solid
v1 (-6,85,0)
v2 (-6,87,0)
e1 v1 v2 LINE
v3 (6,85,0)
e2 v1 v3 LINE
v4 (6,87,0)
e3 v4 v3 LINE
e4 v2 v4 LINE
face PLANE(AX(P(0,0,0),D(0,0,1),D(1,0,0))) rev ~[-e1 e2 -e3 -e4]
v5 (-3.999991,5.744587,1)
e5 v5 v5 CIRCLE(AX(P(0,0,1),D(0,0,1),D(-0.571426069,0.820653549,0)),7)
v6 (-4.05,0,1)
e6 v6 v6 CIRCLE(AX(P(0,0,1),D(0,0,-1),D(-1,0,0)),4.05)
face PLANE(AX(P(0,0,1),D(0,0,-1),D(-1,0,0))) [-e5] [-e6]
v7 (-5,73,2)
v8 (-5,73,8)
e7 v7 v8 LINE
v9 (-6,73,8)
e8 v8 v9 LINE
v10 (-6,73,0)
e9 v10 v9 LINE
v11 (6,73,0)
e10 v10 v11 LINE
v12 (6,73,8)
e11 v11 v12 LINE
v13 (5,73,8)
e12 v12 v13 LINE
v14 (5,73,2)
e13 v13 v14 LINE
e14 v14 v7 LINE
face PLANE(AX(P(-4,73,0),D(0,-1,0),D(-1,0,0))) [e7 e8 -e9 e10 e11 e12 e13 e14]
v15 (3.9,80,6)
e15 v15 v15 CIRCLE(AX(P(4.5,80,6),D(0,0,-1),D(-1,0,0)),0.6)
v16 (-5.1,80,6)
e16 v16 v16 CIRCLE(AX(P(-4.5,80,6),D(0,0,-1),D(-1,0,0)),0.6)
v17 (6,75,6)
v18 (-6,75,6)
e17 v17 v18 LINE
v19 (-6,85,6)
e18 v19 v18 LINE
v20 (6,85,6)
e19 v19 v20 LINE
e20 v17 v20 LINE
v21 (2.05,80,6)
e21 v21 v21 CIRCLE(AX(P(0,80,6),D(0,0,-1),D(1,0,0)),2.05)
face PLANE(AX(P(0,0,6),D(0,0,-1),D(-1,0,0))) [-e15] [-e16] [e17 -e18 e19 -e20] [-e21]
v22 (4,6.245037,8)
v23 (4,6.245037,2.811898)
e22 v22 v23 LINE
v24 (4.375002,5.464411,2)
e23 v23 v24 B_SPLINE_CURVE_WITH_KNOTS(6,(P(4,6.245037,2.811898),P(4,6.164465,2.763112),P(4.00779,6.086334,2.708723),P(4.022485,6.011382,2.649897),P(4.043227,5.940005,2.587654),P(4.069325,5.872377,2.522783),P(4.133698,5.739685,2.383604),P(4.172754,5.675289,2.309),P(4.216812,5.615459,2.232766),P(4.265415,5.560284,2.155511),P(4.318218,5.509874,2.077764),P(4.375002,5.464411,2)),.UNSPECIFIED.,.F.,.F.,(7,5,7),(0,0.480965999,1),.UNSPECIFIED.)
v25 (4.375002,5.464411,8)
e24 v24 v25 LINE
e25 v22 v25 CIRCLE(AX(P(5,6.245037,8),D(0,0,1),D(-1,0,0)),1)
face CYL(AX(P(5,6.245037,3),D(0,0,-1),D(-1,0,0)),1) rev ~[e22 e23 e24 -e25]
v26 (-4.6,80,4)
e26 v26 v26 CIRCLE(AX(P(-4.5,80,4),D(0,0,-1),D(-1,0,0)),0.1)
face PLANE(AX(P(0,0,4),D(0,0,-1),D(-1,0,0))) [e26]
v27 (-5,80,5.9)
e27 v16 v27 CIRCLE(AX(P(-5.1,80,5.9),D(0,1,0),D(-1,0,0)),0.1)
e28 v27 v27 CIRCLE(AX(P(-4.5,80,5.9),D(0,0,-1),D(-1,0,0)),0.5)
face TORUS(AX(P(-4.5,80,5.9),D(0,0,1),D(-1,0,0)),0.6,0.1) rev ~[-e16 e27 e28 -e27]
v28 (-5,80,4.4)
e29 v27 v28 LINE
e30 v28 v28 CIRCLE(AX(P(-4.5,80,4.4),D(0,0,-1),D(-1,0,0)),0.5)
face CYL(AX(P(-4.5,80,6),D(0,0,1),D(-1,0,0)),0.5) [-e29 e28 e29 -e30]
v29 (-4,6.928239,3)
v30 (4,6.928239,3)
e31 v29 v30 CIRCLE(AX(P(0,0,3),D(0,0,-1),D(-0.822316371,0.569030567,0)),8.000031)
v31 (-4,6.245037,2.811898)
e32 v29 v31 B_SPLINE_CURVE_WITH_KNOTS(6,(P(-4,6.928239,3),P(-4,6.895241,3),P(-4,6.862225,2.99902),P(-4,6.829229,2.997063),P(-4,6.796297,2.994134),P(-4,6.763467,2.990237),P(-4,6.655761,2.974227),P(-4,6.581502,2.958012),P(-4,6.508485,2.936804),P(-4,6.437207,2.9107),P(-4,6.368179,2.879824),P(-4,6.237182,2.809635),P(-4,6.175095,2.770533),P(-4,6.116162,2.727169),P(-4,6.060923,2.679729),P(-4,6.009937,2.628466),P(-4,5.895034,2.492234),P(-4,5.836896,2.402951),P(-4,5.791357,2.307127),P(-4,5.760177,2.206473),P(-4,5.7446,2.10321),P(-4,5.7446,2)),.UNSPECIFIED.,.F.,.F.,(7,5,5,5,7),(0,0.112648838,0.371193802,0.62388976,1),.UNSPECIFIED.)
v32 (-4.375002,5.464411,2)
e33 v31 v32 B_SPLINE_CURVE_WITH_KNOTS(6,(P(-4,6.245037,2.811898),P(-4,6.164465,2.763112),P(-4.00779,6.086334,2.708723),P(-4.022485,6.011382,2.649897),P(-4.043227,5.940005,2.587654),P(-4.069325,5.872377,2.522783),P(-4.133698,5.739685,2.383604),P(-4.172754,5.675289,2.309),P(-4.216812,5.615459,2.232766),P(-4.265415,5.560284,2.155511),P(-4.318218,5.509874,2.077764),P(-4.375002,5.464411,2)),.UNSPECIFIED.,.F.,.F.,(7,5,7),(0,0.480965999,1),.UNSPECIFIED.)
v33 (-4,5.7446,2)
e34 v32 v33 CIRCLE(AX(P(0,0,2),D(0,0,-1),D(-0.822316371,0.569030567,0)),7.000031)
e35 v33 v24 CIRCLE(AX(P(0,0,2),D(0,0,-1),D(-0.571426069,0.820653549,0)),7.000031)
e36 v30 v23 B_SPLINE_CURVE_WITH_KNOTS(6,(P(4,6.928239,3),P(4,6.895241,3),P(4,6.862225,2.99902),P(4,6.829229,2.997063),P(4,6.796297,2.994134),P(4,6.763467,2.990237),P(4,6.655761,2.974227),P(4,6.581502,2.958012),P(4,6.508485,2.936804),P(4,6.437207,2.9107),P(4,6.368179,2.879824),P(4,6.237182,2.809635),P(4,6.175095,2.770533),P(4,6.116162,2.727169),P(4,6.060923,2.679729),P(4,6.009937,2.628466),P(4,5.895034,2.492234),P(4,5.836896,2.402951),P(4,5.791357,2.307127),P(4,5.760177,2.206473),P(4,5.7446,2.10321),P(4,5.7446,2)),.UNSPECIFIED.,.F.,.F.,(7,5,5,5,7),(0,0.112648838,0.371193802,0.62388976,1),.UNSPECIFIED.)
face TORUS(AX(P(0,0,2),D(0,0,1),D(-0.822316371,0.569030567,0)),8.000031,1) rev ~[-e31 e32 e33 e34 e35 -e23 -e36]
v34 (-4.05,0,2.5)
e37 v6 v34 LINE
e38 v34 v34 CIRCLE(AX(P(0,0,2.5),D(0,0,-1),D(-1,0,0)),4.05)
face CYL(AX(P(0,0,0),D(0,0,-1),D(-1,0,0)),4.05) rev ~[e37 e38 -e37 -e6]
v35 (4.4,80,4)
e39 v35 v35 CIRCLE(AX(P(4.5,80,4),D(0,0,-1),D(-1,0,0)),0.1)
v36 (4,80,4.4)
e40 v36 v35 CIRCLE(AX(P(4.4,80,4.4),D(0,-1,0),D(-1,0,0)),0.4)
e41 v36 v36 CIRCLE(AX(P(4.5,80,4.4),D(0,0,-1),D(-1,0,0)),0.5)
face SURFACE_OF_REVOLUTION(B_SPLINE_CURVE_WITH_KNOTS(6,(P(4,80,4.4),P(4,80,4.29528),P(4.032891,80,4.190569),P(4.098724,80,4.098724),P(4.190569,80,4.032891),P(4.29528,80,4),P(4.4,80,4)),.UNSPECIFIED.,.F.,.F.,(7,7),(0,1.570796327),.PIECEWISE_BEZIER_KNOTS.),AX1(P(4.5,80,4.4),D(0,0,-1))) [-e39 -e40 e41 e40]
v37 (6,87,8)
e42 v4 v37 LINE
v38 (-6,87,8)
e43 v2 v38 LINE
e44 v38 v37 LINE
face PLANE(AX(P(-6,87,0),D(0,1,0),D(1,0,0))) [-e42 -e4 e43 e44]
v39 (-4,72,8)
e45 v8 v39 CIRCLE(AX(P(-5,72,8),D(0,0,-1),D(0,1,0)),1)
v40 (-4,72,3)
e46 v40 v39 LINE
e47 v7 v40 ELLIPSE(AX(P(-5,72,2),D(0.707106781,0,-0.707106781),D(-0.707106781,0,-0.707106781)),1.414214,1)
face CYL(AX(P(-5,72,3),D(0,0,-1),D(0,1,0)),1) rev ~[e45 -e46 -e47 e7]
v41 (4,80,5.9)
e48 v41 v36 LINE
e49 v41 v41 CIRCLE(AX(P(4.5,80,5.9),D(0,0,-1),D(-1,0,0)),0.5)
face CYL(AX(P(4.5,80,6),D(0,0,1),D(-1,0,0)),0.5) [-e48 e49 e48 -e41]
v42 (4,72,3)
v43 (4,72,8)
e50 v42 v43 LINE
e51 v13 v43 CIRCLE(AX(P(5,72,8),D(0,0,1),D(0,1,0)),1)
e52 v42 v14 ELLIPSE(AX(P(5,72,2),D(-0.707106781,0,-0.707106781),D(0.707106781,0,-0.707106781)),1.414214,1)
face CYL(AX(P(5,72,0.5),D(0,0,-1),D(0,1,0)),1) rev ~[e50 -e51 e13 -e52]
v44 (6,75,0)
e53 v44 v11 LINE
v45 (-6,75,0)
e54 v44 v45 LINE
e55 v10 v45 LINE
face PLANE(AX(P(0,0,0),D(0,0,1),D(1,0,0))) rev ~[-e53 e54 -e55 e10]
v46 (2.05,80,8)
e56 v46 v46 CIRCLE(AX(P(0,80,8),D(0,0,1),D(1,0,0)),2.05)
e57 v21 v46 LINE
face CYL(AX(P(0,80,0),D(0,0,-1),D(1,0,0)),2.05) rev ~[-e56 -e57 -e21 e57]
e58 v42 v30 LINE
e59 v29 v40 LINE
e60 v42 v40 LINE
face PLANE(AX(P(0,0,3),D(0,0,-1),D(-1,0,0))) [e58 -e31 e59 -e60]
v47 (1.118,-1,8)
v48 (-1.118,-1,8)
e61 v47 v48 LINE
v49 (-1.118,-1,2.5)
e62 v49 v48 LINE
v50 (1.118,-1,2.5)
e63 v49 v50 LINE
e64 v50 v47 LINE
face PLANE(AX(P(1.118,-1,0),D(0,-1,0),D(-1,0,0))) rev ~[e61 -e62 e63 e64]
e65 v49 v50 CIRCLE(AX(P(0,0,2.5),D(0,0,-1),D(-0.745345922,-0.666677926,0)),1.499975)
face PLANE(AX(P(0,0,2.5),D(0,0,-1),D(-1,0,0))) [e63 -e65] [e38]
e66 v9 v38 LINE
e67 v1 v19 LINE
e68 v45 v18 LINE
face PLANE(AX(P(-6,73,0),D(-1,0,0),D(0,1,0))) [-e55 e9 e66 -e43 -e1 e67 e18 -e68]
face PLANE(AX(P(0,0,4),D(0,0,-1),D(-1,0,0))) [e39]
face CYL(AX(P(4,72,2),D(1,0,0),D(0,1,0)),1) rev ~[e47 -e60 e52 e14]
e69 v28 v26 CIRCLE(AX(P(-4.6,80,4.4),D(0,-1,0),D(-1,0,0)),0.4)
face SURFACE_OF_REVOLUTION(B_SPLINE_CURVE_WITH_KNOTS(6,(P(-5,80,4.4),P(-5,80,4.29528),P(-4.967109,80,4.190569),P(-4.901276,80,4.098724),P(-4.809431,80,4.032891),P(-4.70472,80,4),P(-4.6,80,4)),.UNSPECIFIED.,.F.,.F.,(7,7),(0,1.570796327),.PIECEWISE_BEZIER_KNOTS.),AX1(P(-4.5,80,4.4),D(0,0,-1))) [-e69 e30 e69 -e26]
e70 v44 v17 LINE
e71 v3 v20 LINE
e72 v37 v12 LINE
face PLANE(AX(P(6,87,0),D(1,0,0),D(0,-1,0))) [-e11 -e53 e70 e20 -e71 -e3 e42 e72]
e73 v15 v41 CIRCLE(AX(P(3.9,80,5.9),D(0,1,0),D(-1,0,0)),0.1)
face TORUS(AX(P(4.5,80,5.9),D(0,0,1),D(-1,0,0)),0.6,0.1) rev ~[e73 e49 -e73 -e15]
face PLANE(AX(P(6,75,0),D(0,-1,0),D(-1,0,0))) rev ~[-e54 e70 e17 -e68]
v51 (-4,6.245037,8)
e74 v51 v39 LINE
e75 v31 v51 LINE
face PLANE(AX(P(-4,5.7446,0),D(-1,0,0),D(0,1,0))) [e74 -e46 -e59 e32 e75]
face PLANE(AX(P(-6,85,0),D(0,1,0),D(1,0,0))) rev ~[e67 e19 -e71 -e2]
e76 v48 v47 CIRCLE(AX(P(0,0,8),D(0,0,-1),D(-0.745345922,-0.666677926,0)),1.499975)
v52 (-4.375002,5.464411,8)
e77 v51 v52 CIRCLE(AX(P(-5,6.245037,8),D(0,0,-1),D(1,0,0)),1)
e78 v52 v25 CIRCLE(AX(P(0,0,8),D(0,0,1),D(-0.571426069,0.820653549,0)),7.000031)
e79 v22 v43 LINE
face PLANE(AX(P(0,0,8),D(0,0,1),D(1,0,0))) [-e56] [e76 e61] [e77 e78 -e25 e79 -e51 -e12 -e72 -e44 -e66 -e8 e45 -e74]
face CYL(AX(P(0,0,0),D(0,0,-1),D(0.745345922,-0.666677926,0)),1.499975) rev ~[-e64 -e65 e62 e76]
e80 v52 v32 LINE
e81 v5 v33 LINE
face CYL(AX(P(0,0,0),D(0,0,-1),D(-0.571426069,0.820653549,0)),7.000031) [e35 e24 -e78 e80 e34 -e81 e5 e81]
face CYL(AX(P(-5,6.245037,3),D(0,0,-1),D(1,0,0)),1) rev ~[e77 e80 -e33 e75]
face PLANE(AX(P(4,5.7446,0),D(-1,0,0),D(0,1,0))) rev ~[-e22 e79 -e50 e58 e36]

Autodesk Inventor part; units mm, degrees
ref_plane "YZ Plane" through (0, 0, 0) normal (1, 0, 0) x (0, 1, 0)
ref_plane "XZ Plane" through (0, 0, 0) normal (0, 1, 0) x (-1, 0, 0)
ref_plane "XY Plane" through (0, 0, 0) normal (0, 0, 1) x (1, 0, 0)
sketch "Sketch1" plane through (0, 0, 0) normal (0, 0, 1) x (1, 0, 0)
  circle A0 centre (0, 0) radius 4 construction
  arc A1 (-4, 5.7446) -> (4, 5.7446) centre (0, 0) ccw
  line L0 (0, 0) -> (0, 55.7184)
  line L1 (4, 5.7446) -> (4, 73)
  line L2 (-4, 5.7446) -> (-4, 73)
  line L3 (-6, 87) -> (6, 87)
  line L4 (6, 87) -> (6, 73)
  line L5 (-6, 73) -> (-6, 87)
  line L6 (11.9426, 80) -> (-16.3148, 80) construction
  line L7 (6, 73) -> (4, 73)
  line L8 (-4, 73) -> (-6, 73)
  arc A2 (1.118, -1) -> (-1.118, -1) centre (0, 0) ccw
  line L9 (1.118, -1) -> (-1.118, -1)
  circle A3 centre (0, 80) radius 2.05
  dimension "d0" = 8
  dimension "d1" = 14
  dimension "d2" = 8
  dimension "d3" = 12
  dimension "d4" = 14
  dimension "d6" = 80
  dimension "d7" = 3
  dimension "d8" = 1
  dimension "d9" = 4.1
extrude "Extrusion1" add sketch "Sketch1" along normal blind 8
sketch "Sketch2" plane through (0, 0, 0) normal (0, 0, -1) x (-1, 0, 0)
  circle A0 centre (0, 0) radius 4.05
  dimension "d12" = 8.1
extrude "Extrusion2" cut sketch "Sketch2" against normal blind 2.5
sketch "Sketch3" plane through (0, 0, 0) normal (0, 0, -1) x (-1, 0, 0)
  line L0 (-4, 73) -> (-4, 5.7446) projected
  line L1 (4, 5.7446) -> (4, 73) projected
  arc A0 (4, 5.7446) -> (-4, 5.7446) centre (0, 0) ccw
  line L2 (4, 73) -> (6, 73) projected
  line L3 (-4, 73) -> (4, 73)
extrude "Extrusion3" cut sketch "Sketch3" against normal blind 3
sketch "Sketch4" plane through (0, 0, 0) normal (0, 0, -1) x (-1, 0, 0)
  line L0 (-6, 73) -> (-6, 87) projected
  line L1 (6, 87) -> (6, 73) projected
  line L2 (-6, 75) -> (6, 75)
  line L3 (6, 75) -> (6, 85)
  line L4 (6, 85) -> (-6, 85)
  line L5 (-6, 85) -> (-6, 75)
  line L6 (-6, 73) -> (6, 73) projected
  line L7 (6, 87) -> (-6, 87) projected
  point P0 (0, 0)
  dimension "d17" = 2
  dimension "d18" = 2
extrude "Extrusion4" cut sketch "Sketch4" against normal blind 6 contours L0 L4 L1 L2
fillet "Fillet1" radius 1 6 edges at (4, 73, 5.5) (0, 73, 3) (-4, 73, 5.5) (0, 7, 3) (4, 5.7446, 5.5) (-4, 5.7446, 5.5)
sketch "Sketch5" plane through (0, 0, 6) normal (0, 0, -1) x (-1, 0, 0)
  circle A0 centre (-4.5, 80) radius 0.6105 projected
  circle A1 centre (4.5, 80) radius 0.6105 projected
  circle A2 centre (-4.5, 80) radius 0.5
  circle A3 centre (4.5, 80) radius 0.5
  point P0 (0, 0)
  dimension "d22" = 1
extrude "Extrusion5" add sketch "Sketch5" along normal blind 2 contours A2 | A3
fillet "Fillet2" radius 0.1 2 edges at (5, 80, 6) (-4, 80, 6)
fillet "Fillet3" radius 0.4 2 edges at (5, 80, 4) (-4, 80, 4)
sketch "Sketch6" plane through (0, 0, 0) normal (0, 0, -1) x (-1, 0, 0)
  circle A0 centre (0, 0) radius 7 projected
extrude "Extrusion6" cut sketch "Sketch6" against normal blind 1
properties part number "Arm1" material "PC/ABS Plastic"
